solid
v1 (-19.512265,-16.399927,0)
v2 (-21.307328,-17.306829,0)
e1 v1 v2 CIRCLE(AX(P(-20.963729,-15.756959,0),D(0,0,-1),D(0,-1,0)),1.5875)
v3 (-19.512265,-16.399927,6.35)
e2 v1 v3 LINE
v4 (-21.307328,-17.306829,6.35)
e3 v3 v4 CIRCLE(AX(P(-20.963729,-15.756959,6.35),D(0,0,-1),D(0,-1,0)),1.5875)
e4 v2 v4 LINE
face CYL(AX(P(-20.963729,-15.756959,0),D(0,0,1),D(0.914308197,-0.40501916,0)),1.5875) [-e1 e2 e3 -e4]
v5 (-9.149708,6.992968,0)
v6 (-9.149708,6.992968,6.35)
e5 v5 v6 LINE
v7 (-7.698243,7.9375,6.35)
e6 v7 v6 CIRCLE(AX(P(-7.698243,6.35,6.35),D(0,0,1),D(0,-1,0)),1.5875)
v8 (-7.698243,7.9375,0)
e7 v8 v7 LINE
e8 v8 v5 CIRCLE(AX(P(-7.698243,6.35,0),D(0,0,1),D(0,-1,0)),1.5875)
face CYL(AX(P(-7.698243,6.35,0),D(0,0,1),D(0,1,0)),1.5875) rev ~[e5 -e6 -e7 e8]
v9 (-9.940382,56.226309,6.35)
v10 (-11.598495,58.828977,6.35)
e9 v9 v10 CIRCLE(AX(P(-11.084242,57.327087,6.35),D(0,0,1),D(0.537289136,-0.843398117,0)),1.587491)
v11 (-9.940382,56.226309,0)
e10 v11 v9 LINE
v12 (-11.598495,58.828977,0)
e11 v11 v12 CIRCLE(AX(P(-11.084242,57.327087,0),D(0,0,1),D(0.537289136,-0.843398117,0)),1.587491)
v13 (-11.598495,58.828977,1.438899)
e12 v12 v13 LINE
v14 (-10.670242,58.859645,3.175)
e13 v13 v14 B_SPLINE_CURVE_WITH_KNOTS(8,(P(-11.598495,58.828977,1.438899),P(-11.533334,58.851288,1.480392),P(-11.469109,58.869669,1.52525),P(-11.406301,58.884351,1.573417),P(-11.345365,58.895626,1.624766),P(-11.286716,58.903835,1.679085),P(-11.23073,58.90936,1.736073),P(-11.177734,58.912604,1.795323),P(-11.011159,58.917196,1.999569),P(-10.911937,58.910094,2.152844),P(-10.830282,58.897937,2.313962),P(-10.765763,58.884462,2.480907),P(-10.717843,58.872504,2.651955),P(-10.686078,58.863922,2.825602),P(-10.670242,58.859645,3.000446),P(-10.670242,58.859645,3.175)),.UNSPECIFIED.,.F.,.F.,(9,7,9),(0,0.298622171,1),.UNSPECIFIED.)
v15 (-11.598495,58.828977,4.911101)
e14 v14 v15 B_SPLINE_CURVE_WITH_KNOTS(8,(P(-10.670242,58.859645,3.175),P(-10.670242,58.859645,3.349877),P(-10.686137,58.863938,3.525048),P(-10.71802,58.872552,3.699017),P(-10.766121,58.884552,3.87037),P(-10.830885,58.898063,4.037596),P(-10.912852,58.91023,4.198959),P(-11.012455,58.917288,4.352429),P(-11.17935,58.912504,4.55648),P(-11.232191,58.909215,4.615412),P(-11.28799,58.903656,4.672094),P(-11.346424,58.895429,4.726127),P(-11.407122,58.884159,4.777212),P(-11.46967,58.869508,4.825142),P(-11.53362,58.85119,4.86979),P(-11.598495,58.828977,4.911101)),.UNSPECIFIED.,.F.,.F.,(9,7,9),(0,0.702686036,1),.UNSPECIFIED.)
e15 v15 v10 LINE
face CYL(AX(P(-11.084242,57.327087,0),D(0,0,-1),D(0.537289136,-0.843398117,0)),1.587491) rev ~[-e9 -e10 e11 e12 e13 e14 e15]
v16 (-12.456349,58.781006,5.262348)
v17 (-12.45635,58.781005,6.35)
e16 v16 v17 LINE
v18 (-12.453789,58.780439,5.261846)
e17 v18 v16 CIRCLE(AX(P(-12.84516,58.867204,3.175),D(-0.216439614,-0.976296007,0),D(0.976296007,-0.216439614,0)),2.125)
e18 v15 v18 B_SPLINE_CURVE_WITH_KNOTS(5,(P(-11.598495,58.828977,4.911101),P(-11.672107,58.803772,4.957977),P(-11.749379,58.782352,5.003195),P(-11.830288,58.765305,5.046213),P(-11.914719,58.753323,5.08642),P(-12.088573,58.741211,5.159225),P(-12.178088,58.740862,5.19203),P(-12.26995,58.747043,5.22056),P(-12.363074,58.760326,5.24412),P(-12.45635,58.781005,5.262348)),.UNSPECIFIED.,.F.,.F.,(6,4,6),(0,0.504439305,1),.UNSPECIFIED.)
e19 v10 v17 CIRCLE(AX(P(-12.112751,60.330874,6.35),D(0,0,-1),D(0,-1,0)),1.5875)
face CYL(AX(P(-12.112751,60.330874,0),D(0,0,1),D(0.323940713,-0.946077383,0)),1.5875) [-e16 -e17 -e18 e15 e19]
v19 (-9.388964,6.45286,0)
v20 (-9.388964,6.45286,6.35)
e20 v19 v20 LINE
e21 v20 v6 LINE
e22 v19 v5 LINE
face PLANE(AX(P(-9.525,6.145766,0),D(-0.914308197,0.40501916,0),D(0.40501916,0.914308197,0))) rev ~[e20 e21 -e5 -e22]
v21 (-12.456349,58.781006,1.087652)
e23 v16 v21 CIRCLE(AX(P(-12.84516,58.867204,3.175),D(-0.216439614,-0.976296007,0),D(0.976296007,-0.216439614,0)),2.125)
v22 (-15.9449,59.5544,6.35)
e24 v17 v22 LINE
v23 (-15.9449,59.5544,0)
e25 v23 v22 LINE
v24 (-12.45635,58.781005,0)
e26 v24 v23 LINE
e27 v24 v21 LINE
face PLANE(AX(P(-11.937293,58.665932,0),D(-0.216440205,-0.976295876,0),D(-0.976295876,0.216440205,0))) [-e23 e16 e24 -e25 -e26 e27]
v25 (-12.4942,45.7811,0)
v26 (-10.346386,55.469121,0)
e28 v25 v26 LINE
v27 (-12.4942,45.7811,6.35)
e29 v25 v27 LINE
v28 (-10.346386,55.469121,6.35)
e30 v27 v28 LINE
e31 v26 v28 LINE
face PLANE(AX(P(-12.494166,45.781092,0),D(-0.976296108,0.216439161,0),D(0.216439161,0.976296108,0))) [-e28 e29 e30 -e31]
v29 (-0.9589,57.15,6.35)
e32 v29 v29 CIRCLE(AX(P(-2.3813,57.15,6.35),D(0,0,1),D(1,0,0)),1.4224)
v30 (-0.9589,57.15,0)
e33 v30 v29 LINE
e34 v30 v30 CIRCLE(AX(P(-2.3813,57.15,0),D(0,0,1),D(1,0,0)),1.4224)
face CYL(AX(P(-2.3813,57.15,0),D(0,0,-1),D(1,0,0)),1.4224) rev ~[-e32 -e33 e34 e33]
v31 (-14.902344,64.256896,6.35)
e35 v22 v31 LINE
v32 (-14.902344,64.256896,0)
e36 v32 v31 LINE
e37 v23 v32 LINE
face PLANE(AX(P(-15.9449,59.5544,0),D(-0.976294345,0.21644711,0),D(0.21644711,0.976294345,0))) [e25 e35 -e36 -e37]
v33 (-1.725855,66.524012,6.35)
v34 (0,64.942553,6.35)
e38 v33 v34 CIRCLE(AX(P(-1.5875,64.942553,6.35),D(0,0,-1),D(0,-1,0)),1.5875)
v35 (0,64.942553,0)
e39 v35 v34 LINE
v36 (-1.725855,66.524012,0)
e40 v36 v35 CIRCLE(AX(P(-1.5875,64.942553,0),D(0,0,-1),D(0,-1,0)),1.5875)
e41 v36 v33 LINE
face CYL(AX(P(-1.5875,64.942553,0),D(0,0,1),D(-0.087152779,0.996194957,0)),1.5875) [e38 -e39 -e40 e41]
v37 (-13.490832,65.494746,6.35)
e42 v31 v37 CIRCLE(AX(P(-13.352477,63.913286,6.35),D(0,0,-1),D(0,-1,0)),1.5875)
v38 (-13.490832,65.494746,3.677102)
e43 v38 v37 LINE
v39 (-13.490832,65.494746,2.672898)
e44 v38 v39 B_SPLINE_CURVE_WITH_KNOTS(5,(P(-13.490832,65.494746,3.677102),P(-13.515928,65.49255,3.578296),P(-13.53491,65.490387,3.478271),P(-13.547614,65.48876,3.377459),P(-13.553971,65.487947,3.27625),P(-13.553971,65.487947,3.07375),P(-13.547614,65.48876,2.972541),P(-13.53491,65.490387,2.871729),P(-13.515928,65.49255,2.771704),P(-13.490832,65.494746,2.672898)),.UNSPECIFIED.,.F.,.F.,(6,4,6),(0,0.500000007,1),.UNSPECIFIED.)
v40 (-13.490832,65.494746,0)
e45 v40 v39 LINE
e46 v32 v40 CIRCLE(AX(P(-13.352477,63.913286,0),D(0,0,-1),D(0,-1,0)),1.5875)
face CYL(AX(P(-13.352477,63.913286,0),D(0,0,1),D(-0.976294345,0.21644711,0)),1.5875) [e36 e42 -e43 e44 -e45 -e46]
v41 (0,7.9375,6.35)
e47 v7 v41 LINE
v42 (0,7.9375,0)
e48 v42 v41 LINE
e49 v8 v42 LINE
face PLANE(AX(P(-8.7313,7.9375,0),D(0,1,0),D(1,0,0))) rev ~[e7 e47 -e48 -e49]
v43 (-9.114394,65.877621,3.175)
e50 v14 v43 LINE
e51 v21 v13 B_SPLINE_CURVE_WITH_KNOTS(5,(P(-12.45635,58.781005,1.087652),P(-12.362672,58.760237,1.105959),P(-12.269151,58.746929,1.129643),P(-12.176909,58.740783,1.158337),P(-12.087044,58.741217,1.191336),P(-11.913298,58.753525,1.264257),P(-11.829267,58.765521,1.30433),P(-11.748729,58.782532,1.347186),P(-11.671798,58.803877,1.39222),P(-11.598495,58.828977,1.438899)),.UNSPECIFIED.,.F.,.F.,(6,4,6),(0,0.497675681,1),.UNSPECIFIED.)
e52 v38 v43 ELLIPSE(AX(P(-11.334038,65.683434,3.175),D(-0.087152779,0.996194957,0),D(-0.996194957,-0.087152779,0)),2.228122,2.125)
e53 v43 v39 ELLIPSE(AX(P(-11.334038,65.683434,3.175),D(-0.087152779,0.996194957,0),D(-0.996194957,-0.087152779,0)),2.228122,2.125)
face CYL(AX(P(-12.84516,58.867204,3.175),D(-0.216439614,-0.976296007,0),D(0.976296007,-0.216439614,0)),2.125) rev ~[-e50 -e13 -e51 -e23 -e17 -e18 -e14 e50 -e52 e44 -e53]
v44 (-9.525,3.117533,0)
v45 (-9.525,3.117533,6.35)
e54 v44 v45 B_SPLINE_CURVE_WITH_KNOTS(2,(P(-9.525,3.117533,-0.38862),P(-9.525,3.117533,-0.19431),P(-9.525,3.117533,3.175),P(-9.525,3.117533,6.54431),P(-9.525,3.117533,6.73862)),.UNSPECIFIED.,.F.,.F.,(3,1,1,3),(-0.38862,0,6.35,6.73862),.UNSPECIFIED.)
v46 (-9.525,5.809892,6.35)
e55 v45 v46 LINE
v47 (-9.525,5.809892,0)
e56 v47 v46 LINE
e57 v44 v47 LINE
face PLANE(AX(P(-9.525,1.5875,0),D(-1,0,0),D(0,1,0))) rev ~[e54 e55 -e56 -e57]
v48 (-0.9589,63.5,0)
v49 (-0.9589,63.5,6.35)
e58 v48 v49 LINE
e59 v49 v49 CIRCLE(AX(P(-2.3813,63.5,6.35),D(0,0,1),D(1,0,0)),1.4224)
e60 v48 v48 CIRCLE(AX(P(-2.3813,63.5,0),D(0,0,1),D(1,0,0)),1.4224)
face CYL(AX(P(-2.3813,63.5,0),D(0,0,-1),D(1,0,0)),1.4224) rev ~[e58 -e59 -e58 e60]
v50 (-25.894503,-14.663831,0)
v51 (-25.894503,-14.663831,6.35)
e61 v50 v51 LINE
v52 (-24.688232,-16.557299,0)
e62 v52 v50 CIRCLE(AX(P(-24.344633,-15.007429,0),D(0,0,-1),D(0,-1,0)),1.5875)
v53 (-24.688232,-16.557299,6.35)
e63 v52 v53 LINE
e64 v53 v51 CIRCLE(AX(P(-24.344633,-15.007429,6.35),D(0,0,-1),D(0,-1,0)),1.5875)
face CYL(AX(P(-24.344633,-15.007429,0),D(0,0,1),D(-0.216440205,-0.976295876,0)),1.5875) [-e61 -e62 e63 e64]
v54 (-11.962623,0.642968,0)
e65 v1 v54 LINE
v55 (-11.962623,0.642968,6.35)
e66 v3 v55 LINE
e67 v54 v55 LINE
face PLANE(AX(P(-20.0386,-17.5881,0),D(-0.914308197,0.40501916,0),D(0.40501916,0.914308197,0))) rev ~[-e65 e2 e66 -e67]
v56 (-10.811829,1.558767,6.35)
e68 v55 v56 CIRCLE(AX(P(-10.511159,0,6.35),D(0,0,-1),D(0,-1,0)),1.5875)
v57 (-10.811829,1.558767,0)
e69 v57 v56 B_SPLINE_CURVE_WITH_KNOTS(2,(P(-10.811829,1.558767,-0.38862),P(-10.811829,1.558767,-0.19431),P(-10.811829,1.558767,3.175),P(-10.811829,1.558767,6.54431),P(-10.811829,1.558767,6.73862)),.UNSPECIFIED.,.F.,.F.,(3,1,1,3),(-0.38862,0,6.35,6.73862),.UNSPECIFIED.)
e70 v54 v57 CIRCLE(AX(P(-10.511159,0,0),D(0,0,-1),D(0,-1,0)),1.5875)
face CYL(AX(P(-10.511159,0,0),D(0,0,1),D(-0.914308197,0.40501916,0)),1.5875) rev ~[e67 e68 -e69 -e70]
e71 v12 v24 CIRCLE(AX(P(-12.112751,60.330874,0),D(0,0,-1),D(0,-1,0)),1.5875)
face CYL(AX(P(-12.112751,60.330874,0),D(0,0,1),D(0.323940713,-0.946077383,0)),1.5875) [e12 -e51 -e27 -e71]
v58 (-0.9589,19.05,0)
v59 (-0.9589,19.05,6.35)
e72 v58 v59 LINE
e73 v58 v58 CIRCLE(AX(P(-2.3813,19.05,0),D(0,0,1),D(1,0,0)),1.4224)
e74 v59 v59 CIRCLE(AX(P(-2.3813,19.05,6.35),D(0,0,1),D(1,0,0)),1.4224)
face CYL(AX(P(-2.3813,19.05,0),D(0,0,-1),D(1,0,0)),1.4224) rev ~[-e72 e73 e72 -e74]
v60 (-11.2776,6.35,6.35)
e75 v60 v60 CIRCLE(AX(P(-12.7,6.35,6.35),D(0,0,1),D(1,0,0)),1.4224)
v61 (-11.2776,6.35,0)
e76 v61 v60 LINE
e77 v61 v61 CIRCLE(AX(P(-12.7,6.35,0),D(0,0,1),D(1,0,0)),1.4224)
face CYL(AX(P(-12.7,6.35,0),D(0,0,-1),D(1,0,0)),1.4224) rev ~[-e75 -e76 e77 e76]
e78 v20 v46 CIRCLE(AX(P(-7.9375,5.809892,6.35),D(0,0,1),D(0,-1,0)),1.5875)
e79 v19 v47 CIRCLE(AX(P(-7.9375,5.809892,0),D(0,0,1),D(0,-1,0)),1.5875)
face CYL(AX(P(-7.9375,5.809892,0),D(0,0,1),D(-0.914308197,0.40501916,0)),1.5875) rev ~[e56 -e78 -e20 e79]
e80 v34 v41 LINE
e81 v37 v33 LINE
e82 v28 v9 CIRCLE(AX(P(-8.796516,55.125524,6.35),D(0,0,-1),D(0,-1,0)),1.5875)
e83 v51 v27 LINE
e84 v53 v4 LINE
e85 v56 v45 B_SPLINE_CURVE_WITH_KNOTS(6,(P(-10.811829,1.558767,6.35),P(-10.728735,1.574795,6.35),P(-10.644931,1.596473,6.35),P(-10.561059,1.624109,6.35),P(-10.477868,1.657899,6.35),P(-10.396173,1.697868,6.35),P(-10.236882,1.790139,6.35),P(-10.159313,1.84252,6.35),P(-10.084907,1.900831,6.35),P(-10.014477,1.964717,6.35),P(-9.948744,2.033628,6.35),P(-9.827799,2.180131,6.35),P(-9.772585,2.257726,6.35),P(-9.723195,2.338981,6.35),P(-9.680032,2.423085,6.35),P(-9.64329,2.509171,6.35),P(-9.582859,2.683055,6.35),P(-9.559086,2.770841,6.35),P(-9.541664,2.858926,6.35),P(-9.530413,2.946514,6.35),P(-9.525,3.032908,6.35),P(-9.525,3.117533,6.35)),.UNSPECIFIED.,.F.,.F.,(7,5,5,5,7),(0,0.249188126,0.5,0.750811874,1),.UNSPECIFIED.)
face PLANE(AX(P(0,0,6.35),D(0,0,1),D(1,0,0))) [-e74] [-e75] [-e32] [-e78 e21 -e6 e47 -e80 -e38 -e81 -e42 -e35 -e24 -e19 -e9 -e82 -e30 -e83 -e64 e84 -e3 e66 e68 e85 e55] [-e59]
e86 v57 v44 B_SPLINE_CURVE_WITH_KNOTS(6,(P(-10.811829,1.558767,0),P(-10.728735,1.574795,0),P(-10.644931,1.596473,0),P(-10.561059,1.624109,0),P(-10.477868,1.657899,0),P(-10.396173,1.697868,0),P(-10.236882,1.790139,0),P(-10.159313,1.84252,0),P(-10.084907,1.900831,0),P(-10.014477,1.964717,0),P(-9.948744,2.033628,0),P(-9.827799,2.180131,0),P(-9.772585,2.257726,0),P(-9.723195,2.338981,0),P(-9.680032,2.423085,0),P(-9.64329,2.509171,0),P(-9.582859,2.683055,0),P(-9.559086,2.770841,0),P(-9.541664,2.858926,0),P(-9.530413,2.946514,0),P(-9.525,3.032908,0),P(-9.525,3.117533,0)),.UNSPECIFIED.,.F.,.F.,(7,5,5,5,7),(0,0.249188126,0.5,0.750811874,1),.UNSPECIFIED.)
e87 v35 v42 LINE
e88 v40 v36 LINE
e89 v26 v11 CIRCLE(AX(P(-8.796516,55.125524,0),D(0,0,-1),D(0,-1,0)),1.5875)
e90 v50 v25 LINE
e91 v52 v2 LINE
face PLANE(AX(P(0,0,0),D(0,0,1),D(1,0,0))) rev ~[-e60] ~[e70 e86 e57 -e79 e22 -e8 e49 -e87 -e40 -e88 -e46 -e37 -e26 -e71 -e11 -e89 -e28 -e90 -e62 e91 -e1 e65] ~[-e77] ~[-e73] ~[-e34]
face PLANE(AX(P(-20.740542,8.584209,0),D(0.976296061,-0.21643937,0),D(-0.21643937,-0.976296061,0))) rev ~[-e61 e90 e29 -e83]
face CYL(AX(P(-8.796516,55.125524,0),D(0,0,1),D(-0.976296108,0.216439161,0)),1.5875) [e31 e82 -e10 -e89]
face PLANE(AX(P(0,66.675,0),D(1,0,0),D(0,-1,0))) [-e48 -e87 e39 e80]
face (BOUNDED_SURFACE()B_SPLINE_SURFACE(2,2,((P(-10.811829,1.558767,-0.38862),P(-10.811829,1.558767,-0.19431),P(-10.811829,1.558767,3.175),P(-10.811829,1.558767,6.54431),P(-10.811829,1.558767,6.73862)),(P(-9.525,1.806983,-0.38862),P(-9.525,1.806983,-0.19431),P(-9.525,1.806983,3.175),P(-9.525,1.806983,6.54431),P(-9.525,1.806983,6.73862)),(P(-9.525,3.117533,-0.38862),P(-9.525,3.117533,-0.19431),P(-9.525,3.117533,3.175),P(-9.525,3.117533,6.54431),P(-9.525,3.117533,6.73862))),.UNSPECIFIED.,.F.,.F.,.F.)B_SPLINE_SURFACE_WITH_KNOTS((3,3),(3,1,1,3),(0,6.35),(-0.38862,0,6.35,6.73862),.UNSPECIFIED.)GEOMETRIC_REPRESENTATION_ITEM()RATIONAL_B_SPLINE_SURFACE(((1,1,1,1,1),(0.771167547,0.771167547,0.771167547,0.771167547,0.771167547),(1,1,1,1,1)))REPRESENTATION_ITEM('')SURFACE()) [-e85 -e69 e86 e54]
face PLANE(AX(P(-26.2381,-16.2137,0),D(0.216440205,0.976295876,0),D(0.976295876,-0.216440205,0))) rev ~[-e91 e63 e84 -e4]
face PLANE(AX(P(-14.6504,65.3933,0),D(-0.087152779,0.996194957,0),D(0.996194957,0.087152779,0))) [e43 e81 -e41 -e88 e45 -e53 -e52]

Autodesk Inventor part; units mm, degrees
ref_plane "YZ Plane" through (0, 0, 0) normal (1, 0, 0) x (0, 1, 0)
ref_plane "XZ Plane" through (0, 0, 0) normal (0, 1, 0) x (-1, 0, 0)
ref_plane "XY Plane" through (0, 0, 0) normal (0, 0, 1) x (1, 0, 0)
sketch "Sketch1" plane through (0, 0, 0) normal (0, 0, 1) x (1, 0, 0)
  line L0 (0, 0) -> (0, 136.525) construction
  line L1 (-11.7886, 12.2907) -> (-39.6863, 18.4755) construction
  line L2 (-39.6863, 18.4755) -> (-33.3297, 47.1481) construction
  line L3 (-33.3297, 47.1481) -> (-5.432, 40.9633) construction
  line L4 (-5.432, 40.9633) -> (-11.7886, 12.2907) construction
  line L5 (-39.6863, 18.4755) -> (-5.432, 40.9633) construction
  line L6 (-33.3297, 47.1481) -> (-11.7886, 12.2907) construction
  circle A0 centre (-53.975, 12.7) radius 3.175 construction
  circle A1 centre (-53.975, 12.7) radius 6.35 construction
  line L7 (0, 0) -> (-54.712, 6.3929) construction
  line L8 (-59.6703, 15.5082) -> (0, 136.525) construction
  line L9 (-27.1302, 45.7737) -> (-37.4529, 28.5497) construction
  line L10 (-11.6315, 42.3377) -> (-9.5552, 22.3649) construction
  line L11 (-19.3809, 44.0557) -> (-25.7374, 15.3831) construction
  line L12 (0, 92.075) -> (-19.7574, 96.4551) construction
  line L13 (-35.3766, 8.5768) -> (-19.8779, 5.1408) construction
  line L14 (-19.8779, 5.1408) -> (-21.2523, -1.0586) construction
  line L15 (-21.2523, -1.0586) -> (-36.751, 2.3773) construction
  line L16 (-36.751, 2.3773) -> (-35.3766, 8.5768) construction
  line L17 (-35.3766, 8.5768) -> (-41.27, 4.8223) construction
  line L18 (-19.8779, 5.1408) -> (-17.9381, 2.096) construction
  line L19 (-5.432, 40.9633) -> (-33.3297, 47.1481) construction
  line L20 (-33.3297, 47.1481) -> (-32.2475, 52.0296) construction
  line L21 (-32.2475, 52.0296) -> (-4.3498, 45.8448) construction
  line L22 (-4.3498, 45.8448) -> (-5.432, 40.9633) construction
  line L23 (-53.2878, 15.7997) -> (-53.975, 12.7) construction
  line L24 (-53.975, 12.7) -> (-57.0747, 13.3872) construction
  line L25 (-27.6272, 6.8588) -> (-34.4992, -24.1386) construction
  line L26 (-31.8676, 50.076) -> (-5.5198, 44.2349)
  line L27 (-5.5198, 44.2349) -> (-4.489, 48.8845) construction
  line L28 (-4.489, 48.8845) -> (-30.8368, 54.7256) construction
  line L29 (-30.8368, 54.7256) -> (-31.8676, 50.076) construction
  line L30 (-31.3522, 52.4008) -> (-5.0044, 46.5597) construction
  circle A2 centre (-29.0274, 51.8854) radius 1.4732 construction
  circle A3 centre (-22.8279, 50.5111) radius 1.4732 construction
  circle A4 centre (-16.6284, 49.1367) radius 1.4732 construction
  circle A5 centre (-10.4289, 47.7623) radius 1.4732
  circle A6 centre (-10.3614, 84.7398) radius 1.4732 construction
  line L31 (-53.975, 12.7) -> (-13.3751, 95.0402) construction
  line L32 (-32.2923, 56.6744) -> (0, 49.5153) construction
  circle A7 centre (-10.3614, 84.7398) radius 4.7625 construction
  line L33 (-4.7625, 50.5712) -> (-4.7625, 93.1308) construction
  line L34 (-27.5056, 55.6132) -> (-14.3936, 82.2055) construction
  line L35 (-5.6003, 84.6261) -> (-4.7625, 84.4403) construction
  line L36 (-17.9381, 2.096) -> (0, 2.096) construction
  line L37 (0, 2.096) -> (0, -1.079) construction
  line L38 (0, -1.079) -> (-17.9381, -1.079) construction
  line L39 (-17.9381, -1.079) -> (-17.9381, 2.096) construction
  circle A8 centre (-12.7, 7.9375) radius 1.5875 construction
  line L40 (-12.7, 7.9375) -> (0, 7.9375)
  line L41 (0, 7.9375) -> (-17.9381, 2.096) construction
  circle A9 centre (-12.7, 7.9375) radius 3.175 construction
  line L42 (-9.525, 7.9375) -> (-9.525, 4.8357) construction
  line L43 (-9.525, 7.9375) -> (0, 7.9375) construction
  line L44 (-17.9187, 46.9837) -> (-16.8879, 51.6333)
  line L45 (-12.4942, 45.7811) -> (-26.2381, -16.2137)
  line L46 (0, 66.675) -> (0, 7.9375)
  line L47 (-26.2381, -16.2137) -> (-20.0386, -17.5881)
  line L48 (-20.0386, -17.5881) -> (-8.7313, 7.9375)
  circle A10 centre (-12.7, 6.35) radius 1.4224
  line L49 (0, 13.4938) -> (-4.7625, 13.4938) construction
  line L50 (-4.7625, 13.4938) -> (-4.7625, 24.6063) construction
  line L51 (-4.7625, 24.6063) -> (0, 24.6063) construction
  line L52 (0, 24.6063) -> (0, 13.4938)
  line L53 (-4.7625, 19.05) -> (0, 19.05) construction
  circle A11 centre (-2.3813, 19.05) radius 1.4224
  line L54 (-20.7405, 8.5842) -> (-9.7454, 58.18)
  line L55 (-9.7454, 58.18) -> (-3.5459, 56.8056) construction
  line L56 (-3.5459, 56.8056) -> (-14.5411, 7.2098) construction
  line L57 (-14.5411, 7.2098) -> (-20.7405, 8.5842)
  line L58 (-12.7, 6.35) -> (-12.7, 7.9375) construction
  line L59 (-11.5442, 1.5875) -> (-9.525, 1.5875)
  line L60 (-9.525, 1.5875) -> (-9.525, 7.9375)
  line L61 (-9.525, 7.9375) -> (-11.5442, 7.9375)
  line L62 (-11.5442, 7.9375) -> (-11.5442, 1.5875) construction
  line L63 (-9.7454, 58.18) -> (-15.9449, 59.5544)
  line L64 (-15.9449, 59.5544) -> (-14.6504, 65.3933)
  line L65 (-14.6504, 65.3933) -> (0, 66.675)
  line L66 (-9.7454, 58.18) -> (-17.3193, 53.3549) construction
  arc A12 (-10.2313, 55.9882) -> (-11.9373, 58.6659) centre (-11.0843, 57.3271) ccw
  line L67 (-4.7625, 57.15) -> (0, 57.15) construction
  circle A13 centre (-2.3813, 57.15) radius 1.4224
  circle A14 centre (-2.3813, 63.5) radius 1.4224
  point P0 (-22.5591, 29.7194)
  point P1 (-20.4869, 2.3938)
  point P2 (-36.3367, 4.2458)
  point P3 (-51.1668, 18.3953)
  point P4 (-11.1125, 7.9375)
  point P5 (-11.4283, 6.9872)
  point P6 (-11.9574, 7.9375)
  point P7 (-13.9717, 6.9872)
  point P8 (-9.525, 6.1457)
  dimension "d74" = 6.35
  dimension "d13" = 136.525
  dimension "d14" = 29.3687
  dimension "d15" = 28.575
  dimension "d16" = 12.5
  dimension "d17" = 6.35
  dimension "d19" = 53.975
  dimension "d22" = 12.7
  dimension "d23" = 7.9375
  dimension "d24" = 19.05
  dimension "d26" = 102.5
  dimension "d29" = 6.35
  dimension "d31" = 7.9375
  dimension "d34" = 5
  dimension "d35" = 26.9875
  dimension "d38" = 31.75
  dimension "d40" = 26.9875
  dimension "d41" = 4.7625
  dimension "d42" = 2.9464
  dimension "d43" = 2.3813
  dimension "d46" = 6.35
  dimension "d51" = 2.9464
  dimension "d52" = 79.7719
  dimension "d53" = 6.35
  dimension "d54" = 9.525
  dimension "d55" = 4.7625
  dimension "d56" = 4.7625
  dimension "d60" = 12.7
  dimension "d61" = 3.175
  dimension "d63" = 3.175
  dimension "d66" = 3.175
  dimension "d67" = 12.7
  dimension "d72" = 8.7312
  dimension "d73" = 7.9375
  dimension "d75" = 34.925
  dimension "d80" = 12.7
  dimension "d82" = 7.9375
  dimension "d83" = 63.5
  dimension "d84" = 66.675
  dimension "d85" = 6.35
  dimension "d86" = 92.075
  dimension "d87" = 2.8448
  dimension "d88" = 4.7625
  dimension "d89" = 11.1125
  dimension "d90" = 2.8448
  dimension "d91" = 19.05
  dimension "d92" = 6.35
  dimension "d93" = 50.8
  dimension "d94" = 25.4
  dimension "d95" = 8.7312
  dimension "d96" = 9.525
  dimension "d97" = 6.35
  dimension "d99" = 6.35
  dimension "d101" = 3.175
  dimension "d106" = 2.8448
  dimension "d107" = 57.15
  dimension "d110" = 6.35
  dimension "d119" = 85
extrude "Extrusion1" add sketch "Sketch1" along normal blind 6.35 contours A5 | L60 L48 L47 L45 L54 A12 L63 L64 L65 L46 L40 | L40 L48 L60 | L60 L59 L48
fillet "Fillet1" radius 1.5875 8 edges at (-26.2381, -16.2137, 3.175) (-20.0386, -17.5881, 3.175) (-11.5442, 1.5875, 3.175) (-9.525, 1.5875, 3.175) (-14.6504, 65.3933, 3.175) (0, 66.675, 3.175) (-9.525, 6.1457, 3.175) (-8.7313, 7.9375, 3.175)
fillet "Fillet4" radius 1.5875 2 edges at (-10.2313, 55.9882, 3.175) (-11.9373, 58.6659, 3.175)
sketch "Sketch2" plane through (-15.9449, 59.5544, 0) normal (-0.2164396, -0.976296, 0) x (0.976296, -0.2164396, 0)
  line L0 (12.3735, 0) -> (1.1101, 0) projected
  line L1 (3.175, 0) -> (3.175, 6.35) construction
  line L2 (0, 6.35) -> (3.5733, 6.35) projected
  circle A0 centre (3.175, 3.175) radius 2.125
  line L3 (0, 0) -> (0, 6.35) projected
  point P0 (28.4569, 0)
  dimension "d115" = 4.25
  dimension "d116" = 3.175
extrude "Extrusion2" cut sketch "Sketch2" against normal through all
equation "\"d56\" = d55"
properties part number "Uprights" material "UHMW, White"
